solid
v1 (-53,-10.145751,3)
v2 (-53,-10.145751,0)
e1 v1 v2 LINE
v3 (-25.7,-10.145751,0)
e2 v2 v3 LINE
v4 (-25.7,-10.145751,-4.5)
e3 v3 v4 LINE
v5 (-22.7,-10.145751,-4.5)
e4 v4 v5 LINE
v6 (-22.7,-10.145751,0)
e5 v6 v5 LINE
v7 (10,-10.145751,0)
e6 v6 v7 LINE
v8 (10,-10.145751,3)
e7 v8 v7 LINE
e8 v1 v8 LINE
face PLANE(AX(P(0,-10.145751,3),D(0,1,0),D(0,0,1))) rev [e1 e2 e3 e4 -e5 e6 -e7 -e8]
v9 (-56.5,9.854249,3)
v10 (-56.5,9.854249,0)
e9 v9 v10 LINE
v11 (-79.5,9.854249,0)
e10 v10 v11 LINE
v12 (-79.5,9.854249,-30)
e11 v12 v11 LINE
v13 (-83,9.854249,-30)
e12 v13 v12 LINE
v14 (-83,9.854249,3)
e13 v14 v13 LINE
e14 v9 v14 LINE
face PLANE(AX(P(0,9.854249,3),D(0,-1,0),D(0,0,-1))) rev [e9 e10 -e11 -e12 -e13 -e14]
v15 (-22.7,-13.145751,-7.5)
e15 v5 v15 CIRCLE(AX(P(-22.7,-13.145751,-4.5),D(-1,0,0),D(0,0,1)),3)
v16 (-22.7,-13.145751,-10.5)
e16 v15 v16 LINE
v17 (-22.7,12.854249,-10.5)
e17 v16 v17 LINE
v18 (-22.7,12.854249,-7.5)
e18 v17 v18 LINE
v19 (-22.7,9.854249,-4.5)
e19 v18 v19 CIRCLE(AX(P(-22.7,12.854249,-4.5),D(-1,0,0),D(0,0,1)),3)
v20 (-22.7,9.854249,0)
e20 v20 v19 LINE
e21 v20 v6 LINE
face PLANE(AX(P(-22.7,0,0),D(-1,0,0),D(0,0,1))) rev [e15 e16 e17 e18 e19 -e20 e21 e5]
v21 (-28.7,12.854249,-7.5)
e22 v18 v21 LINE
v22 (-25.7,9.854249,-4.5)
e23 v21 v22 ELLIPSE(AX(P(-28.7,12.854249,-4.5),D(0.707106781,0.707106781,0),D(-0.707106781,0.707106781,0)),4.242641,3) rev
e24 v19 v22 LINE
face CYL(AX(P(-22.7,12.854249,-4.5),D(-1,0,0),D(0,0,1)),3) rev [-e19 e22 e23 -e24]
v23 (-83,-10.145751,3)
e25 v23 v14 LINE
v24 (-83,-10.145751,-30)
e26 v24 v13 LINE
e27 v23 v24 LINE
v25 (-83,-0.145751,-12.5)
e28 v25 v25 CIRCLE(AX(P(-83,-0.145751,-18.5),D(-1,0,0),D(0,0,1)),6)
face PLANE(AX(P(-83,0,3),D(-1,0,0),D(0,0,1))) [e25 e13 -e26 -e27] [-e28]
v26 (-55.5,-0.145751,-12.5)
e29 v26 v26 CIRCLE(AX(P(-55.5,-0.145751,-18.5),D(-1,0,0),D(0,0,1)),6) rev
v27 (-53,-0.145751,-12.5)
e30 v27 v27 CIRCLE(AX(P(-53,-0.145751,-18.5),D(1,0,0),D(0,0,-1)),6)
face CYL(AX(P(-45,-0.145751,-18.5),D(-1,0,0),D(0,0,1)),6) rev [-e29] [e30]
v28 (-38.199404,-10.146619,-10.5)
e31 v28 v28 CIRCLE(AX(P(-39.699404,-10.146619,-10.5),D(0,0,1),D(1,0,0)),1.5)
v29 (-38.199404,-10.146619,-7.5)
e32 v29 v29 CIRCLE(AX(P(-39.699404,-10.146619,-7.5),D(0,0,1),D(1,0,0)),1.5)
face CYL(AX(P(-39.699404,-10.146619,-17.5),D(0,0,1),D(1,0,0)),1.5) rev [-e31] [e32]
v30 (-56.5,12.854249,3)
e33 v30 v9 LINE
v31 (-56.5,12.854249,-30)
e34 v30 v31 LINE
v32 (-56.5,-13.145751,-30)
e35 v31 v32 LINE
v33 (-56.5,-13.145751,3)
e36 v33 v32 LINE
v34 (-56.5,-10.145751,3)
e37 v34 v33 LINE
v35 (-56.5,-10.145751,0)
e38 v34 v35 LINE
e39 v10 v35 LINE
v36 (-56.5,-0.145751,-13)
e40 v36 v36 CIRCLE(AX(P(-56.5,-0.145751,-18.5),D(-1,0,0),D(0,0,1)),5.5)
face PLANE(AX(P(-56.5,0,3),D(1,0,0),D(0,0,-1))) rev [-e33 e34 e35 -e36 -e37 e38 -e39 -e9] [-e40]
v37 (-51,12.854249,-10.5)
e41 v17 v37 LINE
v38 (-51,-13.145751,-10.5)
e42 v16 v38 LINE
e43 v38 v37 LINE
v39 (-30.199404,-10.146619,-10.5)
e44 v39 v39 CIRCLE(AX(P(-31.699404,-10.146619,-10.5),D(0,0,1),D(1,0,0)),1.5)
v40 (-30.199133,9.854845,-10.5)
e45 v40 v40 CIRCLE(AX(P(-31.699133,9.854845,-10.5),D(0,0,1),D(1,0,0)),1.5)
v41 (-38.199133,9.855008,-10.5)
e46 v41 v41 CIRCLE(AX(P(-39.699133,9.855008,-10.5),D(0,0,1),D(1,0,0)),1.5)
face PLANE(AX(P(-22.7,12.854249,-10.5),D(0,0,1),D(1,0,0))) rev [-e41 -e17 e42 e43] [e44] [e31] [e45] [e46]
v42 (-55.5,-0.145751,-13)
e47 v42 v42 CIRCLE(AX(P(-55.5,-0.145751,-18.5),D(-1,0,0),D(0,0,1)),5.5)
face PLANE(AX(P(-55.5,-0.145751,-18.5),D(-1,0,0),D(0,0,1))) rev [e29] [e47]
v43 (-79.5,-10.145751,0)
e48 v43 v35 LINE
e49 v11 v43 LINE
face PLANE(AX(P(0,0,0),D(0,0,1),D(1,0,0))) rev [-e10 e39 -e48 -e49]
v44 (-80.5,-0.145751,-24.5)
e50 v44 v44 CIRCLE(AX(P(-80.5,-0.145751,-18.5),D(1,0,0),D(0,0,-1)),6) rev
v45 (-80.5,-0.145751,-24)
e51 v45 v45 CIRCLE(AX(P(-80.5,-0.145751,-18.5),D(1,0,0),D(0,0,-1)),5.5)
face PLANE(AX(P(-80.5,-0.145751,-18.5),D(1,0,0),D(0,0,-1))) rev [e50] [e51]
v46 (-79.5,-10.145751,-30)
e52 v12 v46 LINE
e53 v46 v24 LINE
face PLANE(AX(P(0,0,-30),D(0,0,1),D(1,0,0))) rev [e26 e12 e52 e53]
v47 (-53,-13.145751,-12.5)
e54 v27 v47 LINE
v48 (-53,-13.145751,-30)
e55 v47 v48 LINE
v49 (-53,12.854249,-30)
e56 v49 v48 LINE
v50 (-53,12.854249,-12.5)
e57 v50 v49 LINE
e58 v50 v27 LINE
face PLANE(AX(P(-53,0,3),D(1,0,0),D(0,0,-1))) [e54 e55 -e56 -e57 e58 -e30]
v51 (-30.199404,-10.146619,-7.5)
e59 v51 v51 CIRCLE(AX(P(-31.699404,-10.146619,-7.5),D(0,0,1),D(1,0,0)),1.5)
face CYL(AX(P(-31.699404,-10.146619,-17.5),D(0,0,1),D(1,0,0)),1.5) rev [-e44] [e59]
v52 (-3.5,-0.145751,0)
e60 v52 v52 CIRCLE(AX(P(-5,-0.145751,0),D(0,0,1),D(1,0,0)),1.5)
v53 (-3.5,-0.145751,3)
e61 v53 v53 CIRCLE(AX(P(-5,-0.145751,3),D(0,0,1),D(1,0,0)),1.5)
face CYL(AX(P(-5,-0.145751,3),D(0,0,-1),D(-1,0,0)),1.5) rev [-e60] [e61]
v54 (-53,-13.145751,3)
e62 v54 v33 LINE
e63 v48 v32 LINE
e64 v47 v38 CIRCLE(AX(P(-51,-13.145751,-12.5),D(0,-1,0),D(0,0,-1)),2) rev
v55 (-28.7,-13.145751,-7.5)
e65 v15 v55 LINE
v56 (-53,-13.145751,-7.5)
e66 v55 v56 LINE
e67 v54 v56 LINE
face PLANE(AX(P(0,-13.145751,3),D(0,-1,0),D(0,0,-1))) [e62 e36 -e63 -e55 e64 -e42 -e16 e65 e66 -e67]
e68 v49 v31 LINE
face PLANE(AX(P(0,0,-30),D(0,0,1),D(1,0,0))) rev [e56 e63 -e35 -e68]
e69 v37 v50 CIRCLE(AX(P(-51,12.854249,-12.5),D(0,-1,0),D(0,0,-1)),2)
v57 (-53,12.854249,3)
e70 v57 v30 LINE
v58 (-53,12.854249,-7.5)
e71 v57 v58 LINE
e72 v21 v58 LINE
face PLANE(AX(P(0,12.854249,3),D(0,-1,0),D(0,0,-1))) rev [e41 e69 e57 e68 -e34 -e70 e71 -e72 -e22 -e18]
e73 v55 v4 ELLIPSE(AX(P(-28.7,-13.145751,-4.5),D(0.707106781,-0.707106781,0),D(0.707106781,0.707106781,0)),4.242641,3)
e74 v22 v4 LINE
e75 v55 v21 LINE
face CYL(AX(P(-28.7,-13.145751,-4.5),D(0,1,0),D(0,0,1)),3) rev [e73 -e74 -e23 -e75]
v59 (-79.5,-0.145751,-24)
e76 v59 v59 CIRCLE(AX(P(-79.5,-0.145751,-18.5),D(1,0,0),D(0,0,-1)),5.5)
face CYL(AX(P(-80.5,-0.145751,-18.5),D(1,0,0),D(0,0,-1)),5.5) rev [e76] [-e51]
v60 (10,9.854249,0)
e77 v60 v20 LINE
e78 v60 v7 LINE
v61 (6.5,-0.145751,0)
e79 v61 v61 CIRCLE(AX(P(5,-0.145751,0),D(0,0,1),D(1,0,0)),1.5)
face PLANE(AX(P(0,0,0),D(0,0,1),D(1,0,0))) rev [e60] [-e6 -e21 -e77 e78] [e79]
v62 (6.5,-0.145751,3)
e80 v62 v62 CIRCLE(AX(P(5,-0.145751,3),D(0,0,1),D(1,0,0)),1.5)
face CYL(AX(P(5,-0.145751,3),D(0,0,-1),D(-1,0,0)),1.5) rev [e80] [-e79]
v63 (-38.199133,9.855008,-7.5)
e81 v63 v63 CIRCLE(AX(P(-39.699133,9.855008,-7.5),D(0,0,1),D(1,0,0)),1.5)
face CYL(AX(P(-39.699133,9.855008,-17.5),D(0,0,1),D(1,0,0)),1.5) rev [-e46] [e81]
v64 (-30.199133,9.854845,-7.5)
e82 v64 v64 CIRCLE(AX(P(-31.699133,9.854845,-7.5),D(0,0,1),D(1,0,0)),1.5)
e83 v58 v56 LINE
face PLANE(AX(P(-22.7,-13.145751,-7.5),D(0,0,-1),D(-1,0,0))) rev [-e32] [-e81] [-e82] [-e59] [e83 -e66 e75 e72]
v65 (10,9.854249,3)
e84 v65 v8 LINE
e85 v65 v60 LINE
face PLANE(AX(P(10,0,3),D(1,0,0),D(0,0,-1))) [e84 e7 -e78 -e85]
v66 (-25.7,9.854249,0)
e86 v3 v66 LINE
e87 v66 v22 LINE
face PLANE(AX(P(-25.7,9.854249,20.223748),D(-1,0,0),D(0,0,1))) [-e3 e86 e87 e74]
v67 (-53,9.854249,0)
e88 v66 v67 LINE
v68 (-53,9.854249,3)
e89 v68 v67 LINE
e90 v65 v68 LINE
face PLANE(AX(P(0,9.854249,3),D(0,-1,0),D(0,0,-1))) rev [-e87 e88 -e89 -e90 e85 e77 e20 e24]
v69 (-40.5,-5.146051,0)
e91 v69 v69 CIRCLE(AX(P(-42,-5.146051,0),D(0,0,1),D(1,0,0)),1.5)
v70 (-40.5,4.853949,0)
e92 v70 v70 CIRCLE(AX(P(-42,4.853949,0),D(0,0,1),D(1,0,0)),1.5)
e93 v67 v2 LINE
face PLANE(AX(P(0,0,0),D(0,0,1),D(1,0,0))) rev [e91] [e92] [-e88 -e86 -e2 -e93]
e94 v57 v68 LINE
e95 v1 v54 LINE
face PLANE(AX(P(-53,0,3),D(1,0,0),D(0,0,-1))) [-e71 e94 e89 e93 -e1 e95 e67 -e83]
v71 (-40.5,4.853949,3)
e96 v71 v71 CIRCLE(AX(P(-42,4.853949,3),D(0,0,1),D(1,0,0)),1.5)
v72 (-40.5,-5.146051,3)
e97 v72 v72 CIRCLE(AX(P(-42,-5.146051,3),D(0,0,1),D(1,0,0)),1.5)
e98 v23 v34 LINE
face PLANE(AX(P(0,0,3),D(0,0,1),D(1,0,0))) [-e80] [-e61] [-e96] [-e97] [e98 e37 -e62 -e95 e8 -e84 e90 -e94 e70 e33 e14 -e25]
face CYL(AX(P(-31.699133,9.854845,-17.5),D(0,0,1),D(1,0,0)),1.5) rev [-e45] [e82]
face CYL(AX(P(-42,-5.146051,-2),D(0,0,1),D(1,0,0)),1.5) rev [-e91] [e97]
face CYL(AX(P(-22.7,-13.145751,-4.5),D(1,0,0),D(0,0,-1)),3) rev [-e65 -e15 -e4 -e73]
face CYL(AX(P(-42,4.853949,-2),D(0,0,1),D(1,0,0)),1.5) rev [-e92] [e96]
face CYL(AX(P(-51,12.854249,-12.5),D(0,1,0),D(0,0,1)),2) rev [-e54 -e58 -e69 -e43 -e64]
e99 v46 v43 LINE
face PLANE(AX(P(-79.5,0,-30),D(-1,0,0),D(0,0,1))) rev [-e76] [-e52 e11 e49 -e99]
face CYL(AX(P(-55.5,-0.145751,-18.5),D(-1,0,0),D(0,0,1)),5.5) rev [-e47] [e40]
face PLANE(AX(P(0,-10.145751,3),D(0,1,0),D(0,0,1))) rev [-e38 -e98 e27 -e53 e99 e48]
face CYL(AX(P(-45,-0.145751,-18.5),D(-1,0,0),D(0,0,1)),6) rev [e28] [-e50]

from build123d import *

# Parameters (mm, degrees)
SKETCH_1_W          = 20
SKETCH_1_H          = 20
SKETCH_1_R          = 1.5
SKETCH_1_W_2        = 23
SKETCH_1_W_3        = 3.5
EXTRUDE_1_DEPTH     = 3
EXTRUDE_2_DEPTH     = 30
SKETCH_1_4_W        = 3.5
SKETCH_1_4_H        = 20
EXTRUDE_3_DEPTH     = 30
SKETCH_3_R          = 6
CUT_EXTRUDE_2_DEPTH = 38
SKETCH_4_R          = 6
SKETCH_4_R_2        = 5.5
EXTRUDE_4_DEPTH     = 1
EXTRUDE_START       = -1
SKETCH_5_R          = 6
SKETCH_5_R_2        = 5.5
EXTRUDE_5_DEPTH     = 1
SKETCH_7_R          = 1.5
CUT_EXTRUDE_4_DEPTH = 5
SKETCH_9_W          = 3
SKETCH_9_H          = 26
EXTRUDE_6_DEPTH     = 30.3
SKETCH_10_R         = 1.5
CUT_EXTRUDE_6_DEPTH = 10
FILLET_2_R          = 2
SKETCH_13_W         = 3
SKETCH_13_H         = 20
EXTRUDE_8_DEPTH     = 10.5
FILLET_5_R          = 3


with BuildPart() as part:
    # 草图1 → 凸台-拉伸1 (new body)
    # profile 1 of 5: a face of its own
    with BuildSketch(Plane.XY):
        Polygon((-10, -10.145751311), (-10, 9.854248689), (-53, 9.854248689), (-53, -0.145751311), (-53, -10.145751311), align=None)
    # profile 2 of 5: a face of its own
    with BuildSketch(Plane.XY):
        with Locations((0, -0.145751311)):
            Rectangle(SKETCH_1_W, SKETCH_1_H)
        with Locations((-5, -0.145751311)):
            Circle(SKETCH_1_R, mode=Mode.SUBTRACT)
        with Locations((5, -0.145751311)):
            Circle(SKETCH_1_R, mode=Mode.SUBTRACT)
    # profile 3 of 5: a face of its own
    with BuildSketch(Plane.XY):
        Polygon((-53, -0.145751311), (-53, 9.854248689), (-53, 12.854248689), (-56.5, 12.854248689), (-56.5, 9.854248689), (-56.5, -10.145751311), (-56.5, -13.145751311), (-53, -13.145751311), (-53, -10.145751311), align=None)
    # profile 4 of 5: a face of its own
    with BuildSketch(Plane.XY):
        with Locations((-68, -0.145751311)):
            Rectangle(SKETCH_1_W_2, SKETCH_1_H)
    # profile 5 of 5: a face of its own
    with BuildSketch(Plane.XY):
        with Locations((-81.25, -0.145751311)):
            Rectangle(SKETCH_1_W_3, SKETCH_1_H)
    extrude(amount=EXTRUDE_1_DEPTH)

    # 草图1<3> → 凸台-拉伸2 (add)
    with BuildSketch(Plane.XY):
        Polygon((-53, -0.145751311), (-53, 9.854248689), (-53, 12.854248689), (-56.5, 12.854248689), (-56.5, 9.854248689), (-56.5, -10.145751311), (-56.5, -13.145751311), (-53, -13.145751311), (-53, -10.145751311), align=None)
    extrude(amount=-EXTRUDE_2_DEPTH)

    # 草图1<4> → 凸台-拉伸3 (add)
    with BuildSketch(Plane.XY):
        with Locations((-81.25, -0.145751311)):
            Rectangle(SKETCH_1_4_W, SKETCH_1_4_H)
    extrude(amount=-EXTRUDE_3_DEPTH)

    # 草图3 → 切除-拉伸2 (cut)
    with BuildSketch(Plane.ZY.offset(83)):
        with Locations((-18.5, -0.145751311)):
            Circle(SKETCH_3_R)
    extrude(amount=-CUT_EXTRUDE_2_DEPTH, mode=Mode.SUBTRACT)

    # 草图4 → 凸台-拉伸4 (add)
    with BuildSketch(Plane.ZY.offset(56.5)):
        with Locations((-18.5, -0.145751311)):
            Circle(SKETCH_4_R)
        with Locations((-18.5, -0.145751311)):
            Circle(SKETCH_4_R_2, mode=Mode.SUBTRACT)
    extrude(amount=-EXTRUDE_4_DEPTH)

    # 草图5 → 凸台-拉伸5 (add)
    with BuildSketch(Plane(origin=(-79.5, 0, 0), x_dir=(0, 0, -1), z_dir=(1, 0, 0)).offset(EXTRUDE_START)):
        with Locations(Location((18.5, -0.145751311, 0), (0, 0, 180))):
            Circle(SKETCH_5_R)
        with Locations(Location((18.5, -0.145751311, 0), (0, 0, 180))):
            Circle(SKETCH_5_R_2, mode=Mode.SUBTRACT)
    extrude(amount=EXTRUDE_5_DEPTH)

    # 草图7 → 切除-拉伸4 (cut)
    with BuildSketch(Plane.XY.offset(3)):
        with Locations((-42, 4.853948946)):
            Circle(SKETCH_7_R)
        with Locations((-42, -5.146051054)):
            Circle(SKETCH_7_R)
    extrude(amount=-CUT_EXTRUDE_4_DEPTH, mode=Mode.SUBTRACT)

    # 草图9 → 凸台-拉伸6 (add)
    with BuildSketch(Plane(origin=(-53, 0, 0), x_dir=(0, 0, -1), z_dir=(1, 0, 0))):
        with Locations((9, -0.145751311)):
            Rectangle(SKETCH_9_W, SKETCH_9_H)
    extrude(amount=EXTRUDE_6_DEPTH)

    # 草图10 → 切除-拉伸6 (cut)
    with BuildSketch(Plane.XY.offset(-7.5)):
        with Locations((-31.699132707, 9.854844931)):
            Circle(SKETCH_10_R)
        with Locations((-39.699132705, 9.855007549)):
            Circle(SKETCH_10_R)
        with Locations((-31.699403758, -10.146618604)):
            Circle(SKETCH_10_R)
        with Locations((-39.699403758, -10.146618604)):
            Circle(SKETCH_10_R)
    extrude(amount=-CUT_EXTRUDE_6_DEPTH, mode=Mode.SUBTRACT)

    # 圆角2
    fillet_2_edges = [part.edges().sort_by_distance(p)[0] for p in [
        (-53, -0.145751311, -10.5),
    ]]
    fillet(fillet_2_edges, radius=FILLET_2_R - 0.0001)  # a hair under: the kernel refuses the full size

    # 草图13 → 凸台-拉伸8 (add)
    with BuildSketch(Plane(origin=(0, 0, -10.5), x_dir=(-1, 0, 0), z_dir=(0, 0, -1))):
        with Locations((24.2, -0.145751311)):
            Rectangle(SKETCH_13_W, SKETCH_13_H)
    extrude(amount=-EXTRUDE_8_DEPTH)

    # 圆角5
    fillet_5_edges = [part.edges().sort_by_distance(p)[0] for p in [
        (-24.2, 9.854248689, -7.5),
        (-25.7, -0.145751311, -7.5),
        (-24.2, -10.145751311, -7.5),
    ]]
    fillet(fillet_5_edges, radius=FILLET_5_R - 0.0001)  # a hair under: the kernel refuses the full size


solid = part.part
